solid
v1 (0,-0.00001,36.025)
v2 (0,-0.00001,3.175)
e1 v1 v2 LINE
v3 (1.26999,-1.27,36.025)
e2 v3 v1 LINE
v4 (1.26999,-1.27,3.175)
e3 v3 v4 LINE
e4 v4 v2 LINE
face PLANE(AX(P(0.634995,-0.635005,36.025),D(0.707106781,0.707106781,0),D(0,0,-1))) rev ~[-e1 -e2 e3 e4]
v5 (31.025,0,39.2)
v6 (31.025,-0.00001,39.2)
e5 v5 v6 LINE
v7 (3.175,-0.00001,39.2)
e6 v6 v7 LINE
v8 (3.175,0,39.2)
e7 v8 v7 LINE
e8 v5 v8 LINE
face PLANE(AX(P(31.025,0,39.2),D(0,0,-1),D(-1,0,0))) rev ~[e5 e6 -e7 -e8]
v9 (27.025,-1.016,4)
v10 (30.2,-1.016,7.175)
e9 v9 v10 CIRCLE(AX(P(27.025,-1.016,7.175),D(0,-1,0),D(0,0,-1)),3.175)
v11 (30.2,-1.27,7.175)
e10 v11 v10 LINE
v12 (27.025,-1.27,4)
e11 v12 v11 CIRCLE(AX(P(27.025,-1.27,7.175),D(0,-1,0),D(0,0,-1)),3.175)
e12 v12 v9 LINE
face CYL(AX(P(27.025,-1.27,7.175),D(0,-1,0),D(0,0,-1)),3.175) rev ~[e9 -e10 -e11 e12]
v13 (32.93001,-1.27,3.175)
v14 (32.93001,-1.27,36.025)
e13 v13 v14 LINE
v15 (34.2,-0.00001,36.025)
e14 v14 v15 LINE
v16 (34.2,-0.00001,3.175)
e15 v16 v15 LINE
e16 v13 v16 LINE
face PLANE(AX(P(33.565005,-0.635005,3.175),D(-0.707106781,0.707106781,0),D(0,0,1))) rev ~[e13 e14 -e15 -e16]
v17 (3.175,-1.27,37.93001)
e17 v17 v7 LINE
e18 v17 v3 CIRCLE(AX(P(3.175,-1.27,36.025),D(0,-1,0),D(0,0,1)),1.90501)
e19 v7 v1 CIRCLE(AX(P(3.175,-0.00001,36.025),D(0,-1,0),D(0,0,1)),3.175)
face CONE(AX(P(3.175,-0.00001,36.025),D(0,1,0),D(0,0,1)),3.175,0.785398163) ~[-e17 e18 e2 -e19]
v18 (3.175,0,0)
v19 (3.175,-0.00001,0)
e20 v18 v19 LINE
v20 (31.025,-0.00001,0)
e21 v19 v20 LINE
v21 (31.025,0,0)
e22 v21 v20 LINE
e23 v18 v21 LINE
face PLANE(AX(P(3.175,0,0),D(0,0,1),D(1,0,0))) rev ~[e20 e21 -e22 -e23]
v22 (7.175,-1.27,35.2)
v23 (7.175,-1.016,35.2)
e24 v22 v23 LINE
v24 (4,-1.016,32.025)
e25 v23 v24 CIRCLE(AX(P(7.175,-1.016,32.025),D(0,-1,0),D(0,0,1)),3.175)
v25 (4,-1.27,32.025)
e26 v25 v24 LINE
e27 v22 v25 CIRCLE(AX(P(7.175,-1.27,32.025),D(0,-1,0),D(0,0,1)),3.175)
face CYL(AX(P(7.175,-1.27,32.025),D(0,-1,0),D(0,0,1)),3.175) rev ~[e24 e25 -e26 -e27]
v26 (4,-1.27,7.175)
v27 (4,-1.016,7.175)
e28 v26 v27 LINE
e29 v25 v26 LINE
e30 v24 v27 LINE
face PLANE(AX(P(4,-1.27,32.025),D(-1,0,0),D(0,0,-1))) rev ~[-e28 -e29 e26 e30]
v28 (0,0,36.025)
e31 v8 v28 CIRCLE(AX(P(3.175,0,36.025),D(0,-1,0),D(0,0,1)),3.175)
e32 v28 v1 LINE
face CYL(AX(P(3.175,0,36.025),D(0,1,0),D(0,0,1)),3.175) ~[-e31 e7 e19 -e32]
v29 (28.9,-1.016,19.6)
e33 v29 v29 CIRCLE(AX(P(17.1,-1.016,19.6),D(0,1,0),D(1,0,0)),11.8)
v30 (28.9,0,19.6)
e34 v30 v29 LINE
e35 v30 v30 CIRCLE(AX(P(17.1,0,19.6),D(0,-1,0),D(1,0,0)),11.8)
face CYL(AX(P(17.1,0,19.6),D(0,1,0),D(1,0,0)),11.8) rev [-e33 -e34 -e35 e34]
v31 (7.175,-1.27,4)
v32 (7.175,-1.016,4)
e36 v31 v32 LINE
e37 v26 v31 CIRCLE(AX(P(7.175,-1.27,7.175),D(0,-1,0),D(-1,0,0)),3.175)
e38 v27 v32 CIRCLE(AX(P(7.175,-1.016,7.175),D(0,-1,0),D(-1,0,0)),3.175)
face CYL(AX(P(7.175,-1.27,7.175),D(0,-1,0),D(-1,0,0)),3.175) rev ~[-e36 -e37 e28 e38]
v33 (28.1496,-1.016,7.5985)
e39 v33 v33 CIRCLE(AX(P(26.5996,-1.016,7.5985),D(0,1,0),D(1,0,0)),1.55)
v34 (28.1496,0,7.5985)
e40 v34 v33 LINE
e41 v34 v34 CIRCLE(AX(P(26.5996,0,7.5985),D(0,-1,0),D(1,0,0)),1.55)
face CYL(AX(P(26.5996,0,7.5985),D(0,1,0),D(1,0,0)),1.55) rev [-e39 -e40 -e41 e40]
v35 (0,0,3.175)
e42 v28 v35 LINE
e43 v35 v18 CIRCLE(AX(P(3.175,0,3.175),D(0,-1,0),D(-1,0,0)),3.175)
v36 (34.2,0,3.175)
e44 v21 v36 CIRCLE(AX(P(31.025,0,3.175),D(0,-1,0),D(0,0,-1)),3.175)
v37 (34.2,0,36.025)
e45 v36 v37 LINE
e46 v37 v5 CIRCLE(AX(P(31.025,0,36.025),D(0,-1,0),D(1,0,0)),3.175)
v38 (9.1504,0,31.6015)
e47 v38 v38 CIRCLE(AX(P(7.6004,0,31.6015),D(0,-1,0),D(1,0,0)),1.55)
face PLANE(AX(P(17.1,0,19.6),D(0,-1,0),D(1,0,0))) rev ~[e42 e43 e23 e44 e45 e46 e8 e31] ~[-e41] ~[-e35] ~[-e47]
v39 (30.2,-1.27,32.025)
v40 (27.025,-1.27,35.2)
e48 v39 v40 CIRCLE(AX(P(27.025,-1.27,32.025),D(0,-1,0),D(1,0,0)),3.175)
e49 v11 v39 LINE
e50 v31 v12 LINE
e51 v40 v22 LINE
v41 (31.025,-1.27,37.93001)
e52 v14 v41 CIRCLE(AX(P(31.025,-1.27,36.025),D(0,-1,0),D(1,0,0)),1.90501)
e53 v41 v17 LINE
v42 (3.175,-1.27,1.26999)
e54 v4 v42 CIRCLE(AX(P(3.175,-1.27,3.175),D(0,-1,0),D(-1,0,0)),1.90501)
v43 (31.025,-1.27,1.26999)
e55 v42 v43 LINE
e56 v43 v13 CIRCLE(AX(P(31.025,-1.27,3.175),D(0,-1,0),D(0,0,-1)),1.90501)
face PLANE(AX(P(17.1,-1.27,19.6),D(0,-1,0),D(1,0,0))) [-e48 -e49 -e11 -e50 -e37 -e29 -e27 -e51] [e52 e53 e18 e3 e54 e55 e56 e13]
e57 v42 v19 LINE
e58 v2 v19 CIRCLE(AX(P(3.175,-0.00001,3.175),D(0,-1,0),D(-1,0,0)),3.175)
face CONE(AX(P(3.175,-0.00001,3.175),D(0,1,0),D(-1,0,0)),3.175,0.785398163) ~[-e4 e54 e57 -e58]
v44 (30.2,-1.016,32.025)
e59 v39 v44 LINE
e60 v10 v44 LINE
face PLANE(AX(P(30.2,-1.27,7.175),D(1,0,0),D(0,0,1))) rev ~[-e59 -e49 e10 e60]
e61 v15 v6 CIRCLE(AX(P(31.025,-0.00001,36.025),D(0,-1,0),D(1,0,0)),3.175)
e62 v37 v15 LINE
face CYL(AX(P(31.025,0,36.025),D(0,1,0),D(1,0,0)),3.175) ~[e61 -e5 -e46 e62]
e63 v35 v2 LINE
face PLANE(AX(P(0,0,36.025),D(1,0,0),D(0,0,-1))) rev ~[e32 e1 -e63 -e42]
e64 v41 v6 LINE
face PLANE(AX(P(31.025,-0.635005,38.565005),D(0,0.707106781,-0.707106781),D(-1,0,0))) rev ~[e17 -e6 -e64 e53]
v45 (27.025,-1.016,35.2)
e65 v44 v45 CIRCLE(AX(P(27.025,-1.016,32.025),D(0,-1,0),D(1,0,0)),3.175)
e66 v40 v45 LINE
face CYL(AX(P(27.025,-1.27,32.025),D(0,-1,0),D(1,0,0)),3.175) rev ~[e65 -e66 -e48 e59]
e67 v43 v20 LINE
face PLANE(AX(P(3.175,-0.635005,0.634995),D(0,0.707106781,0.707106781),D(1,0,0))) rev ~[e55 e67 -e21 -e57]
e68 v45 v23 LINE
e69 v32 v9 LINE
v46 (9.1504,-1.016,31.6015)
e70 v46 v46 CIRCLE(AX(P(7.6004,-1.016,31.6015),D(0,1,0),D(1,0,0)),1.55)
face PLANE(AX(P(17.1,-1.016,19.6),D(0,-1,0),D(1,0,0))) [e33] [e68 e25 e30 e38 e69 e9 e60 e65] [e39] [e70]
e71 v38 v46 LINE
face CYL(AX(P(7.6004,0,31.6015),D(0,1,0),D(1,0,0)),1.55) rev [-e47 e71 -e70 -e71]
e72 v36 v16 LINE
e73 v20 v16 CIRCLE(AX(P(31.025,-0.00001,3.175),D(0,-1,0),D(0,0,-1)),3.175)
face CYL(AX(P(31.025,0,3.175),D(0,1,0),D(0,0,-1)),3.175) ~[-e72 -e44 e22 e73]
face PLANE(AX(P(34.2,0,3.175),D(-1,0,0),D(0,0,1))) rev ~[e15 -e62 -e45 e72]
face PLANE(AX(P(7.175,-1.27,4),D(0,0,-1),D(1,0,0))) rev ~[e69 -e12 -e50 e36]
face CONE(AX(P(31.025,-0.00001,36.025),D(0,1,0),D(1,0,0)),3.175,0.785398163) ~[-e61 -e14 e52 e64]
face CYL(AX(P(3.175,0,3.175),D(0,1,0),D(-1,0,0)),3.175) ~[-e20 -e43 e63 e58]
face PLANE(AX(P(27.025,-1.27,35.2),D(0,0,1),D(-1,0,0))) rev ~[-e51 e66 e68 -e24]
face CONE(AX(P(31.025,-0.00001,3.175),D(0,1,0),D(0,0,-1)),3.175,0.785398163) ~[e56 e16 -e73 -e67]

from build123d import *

# Parameters (mm, degrees)
F0_R     = 1.55
F0_R_2   = 11.8
F1_DEPTH = 1.27
F3_DEPTH = 0.254
F4_SIZE  = 1.26999


# Not quite as in the source:
# - a fillet or chamfer is up to 0.001 mm smaller than in the source, because OpenCascade refuses the exact size


with BuildPart() as f1:
    # F0 (on Front) → F1 (new body)
    with BuildSketch(Plane.XZ):
        with BuildLine():
            ThreePointArc((0, 3.175), (0.9299359697, 0.9299359697), (3.175, 0))
            Line((3.175, 0), (31.025, 0))
            ThreePointArc((31.025, 0), (33.2700640303, 0.9299359697), (34.2, 3.175))
            Line((34.2, 3.175), (34.2, 36.025))
            ThreePointArc((34.2, 36.025), (33.2700640303, 38.2700640303), (31.025, 39.2))
            Line((31.025, 39.2), (3.175, 39.2))
            ThreePointArc((3.175, 39.2), (0.9299359697, 38.2700640303), (0, 36.025))
            Line((0, 36.025), (0, 3.175))
        make_face()
        with Locations((26.5996, 7.5985)):
            Circle(F0_R, mode=Mode.SUBTRACT)
        with Locations((7.6004, 31.6015)):
            Circle(F0_R, mode=Mode.SUBTRACT)
        with Locations((17.1, 19.6)):
            Circle(F0_R_2, mode=Mode.SUBTRACT)
    extrude(amount=F1_DEPTH)

    # F2 (on face) → F3 (cut)
    with BuildSketch(Plane.XZ.offset(1.27)):
        with BuildLine():
            Line((27.025, 35.2), (7.175, 35.2))
            ThreePointArc((7.175, 35.2), (4.9299359697, 34.2700640303), (4, 32.025))
            Line((4, 32.025), (4, 7.175))
            ThreePointArc((4, 7.175), (4.9299359697, 4.9299359697), (7.175, 4))
            Line((7.175, 4), (27.025, 4))
            ThreePointArc((27.025, 4), (29.2700640303, 4.9299359697), (30.2, 7.175))
            Line((30.2, 7.175), (30.2, 32.025))
            ThreePointArc((30.2, 32.025), (29.2700640303, 34.2700640303), (27.025, 35.2))
        make_face()
    extrude(amount=-F3_DEPTH, mode=Mode.SUBTRACT)

    # F4 (size 1.27 in the source; OpenCascade refuses exactly that, so slightly less here)
    f4_edges = [f1.edges().sort_by_distance(p)[0] for p in [
        (34.2, -1.27, 19.6),
    ]]
    chamfer(f4_edges, length=F4_SIZE)


solid = f1.part
